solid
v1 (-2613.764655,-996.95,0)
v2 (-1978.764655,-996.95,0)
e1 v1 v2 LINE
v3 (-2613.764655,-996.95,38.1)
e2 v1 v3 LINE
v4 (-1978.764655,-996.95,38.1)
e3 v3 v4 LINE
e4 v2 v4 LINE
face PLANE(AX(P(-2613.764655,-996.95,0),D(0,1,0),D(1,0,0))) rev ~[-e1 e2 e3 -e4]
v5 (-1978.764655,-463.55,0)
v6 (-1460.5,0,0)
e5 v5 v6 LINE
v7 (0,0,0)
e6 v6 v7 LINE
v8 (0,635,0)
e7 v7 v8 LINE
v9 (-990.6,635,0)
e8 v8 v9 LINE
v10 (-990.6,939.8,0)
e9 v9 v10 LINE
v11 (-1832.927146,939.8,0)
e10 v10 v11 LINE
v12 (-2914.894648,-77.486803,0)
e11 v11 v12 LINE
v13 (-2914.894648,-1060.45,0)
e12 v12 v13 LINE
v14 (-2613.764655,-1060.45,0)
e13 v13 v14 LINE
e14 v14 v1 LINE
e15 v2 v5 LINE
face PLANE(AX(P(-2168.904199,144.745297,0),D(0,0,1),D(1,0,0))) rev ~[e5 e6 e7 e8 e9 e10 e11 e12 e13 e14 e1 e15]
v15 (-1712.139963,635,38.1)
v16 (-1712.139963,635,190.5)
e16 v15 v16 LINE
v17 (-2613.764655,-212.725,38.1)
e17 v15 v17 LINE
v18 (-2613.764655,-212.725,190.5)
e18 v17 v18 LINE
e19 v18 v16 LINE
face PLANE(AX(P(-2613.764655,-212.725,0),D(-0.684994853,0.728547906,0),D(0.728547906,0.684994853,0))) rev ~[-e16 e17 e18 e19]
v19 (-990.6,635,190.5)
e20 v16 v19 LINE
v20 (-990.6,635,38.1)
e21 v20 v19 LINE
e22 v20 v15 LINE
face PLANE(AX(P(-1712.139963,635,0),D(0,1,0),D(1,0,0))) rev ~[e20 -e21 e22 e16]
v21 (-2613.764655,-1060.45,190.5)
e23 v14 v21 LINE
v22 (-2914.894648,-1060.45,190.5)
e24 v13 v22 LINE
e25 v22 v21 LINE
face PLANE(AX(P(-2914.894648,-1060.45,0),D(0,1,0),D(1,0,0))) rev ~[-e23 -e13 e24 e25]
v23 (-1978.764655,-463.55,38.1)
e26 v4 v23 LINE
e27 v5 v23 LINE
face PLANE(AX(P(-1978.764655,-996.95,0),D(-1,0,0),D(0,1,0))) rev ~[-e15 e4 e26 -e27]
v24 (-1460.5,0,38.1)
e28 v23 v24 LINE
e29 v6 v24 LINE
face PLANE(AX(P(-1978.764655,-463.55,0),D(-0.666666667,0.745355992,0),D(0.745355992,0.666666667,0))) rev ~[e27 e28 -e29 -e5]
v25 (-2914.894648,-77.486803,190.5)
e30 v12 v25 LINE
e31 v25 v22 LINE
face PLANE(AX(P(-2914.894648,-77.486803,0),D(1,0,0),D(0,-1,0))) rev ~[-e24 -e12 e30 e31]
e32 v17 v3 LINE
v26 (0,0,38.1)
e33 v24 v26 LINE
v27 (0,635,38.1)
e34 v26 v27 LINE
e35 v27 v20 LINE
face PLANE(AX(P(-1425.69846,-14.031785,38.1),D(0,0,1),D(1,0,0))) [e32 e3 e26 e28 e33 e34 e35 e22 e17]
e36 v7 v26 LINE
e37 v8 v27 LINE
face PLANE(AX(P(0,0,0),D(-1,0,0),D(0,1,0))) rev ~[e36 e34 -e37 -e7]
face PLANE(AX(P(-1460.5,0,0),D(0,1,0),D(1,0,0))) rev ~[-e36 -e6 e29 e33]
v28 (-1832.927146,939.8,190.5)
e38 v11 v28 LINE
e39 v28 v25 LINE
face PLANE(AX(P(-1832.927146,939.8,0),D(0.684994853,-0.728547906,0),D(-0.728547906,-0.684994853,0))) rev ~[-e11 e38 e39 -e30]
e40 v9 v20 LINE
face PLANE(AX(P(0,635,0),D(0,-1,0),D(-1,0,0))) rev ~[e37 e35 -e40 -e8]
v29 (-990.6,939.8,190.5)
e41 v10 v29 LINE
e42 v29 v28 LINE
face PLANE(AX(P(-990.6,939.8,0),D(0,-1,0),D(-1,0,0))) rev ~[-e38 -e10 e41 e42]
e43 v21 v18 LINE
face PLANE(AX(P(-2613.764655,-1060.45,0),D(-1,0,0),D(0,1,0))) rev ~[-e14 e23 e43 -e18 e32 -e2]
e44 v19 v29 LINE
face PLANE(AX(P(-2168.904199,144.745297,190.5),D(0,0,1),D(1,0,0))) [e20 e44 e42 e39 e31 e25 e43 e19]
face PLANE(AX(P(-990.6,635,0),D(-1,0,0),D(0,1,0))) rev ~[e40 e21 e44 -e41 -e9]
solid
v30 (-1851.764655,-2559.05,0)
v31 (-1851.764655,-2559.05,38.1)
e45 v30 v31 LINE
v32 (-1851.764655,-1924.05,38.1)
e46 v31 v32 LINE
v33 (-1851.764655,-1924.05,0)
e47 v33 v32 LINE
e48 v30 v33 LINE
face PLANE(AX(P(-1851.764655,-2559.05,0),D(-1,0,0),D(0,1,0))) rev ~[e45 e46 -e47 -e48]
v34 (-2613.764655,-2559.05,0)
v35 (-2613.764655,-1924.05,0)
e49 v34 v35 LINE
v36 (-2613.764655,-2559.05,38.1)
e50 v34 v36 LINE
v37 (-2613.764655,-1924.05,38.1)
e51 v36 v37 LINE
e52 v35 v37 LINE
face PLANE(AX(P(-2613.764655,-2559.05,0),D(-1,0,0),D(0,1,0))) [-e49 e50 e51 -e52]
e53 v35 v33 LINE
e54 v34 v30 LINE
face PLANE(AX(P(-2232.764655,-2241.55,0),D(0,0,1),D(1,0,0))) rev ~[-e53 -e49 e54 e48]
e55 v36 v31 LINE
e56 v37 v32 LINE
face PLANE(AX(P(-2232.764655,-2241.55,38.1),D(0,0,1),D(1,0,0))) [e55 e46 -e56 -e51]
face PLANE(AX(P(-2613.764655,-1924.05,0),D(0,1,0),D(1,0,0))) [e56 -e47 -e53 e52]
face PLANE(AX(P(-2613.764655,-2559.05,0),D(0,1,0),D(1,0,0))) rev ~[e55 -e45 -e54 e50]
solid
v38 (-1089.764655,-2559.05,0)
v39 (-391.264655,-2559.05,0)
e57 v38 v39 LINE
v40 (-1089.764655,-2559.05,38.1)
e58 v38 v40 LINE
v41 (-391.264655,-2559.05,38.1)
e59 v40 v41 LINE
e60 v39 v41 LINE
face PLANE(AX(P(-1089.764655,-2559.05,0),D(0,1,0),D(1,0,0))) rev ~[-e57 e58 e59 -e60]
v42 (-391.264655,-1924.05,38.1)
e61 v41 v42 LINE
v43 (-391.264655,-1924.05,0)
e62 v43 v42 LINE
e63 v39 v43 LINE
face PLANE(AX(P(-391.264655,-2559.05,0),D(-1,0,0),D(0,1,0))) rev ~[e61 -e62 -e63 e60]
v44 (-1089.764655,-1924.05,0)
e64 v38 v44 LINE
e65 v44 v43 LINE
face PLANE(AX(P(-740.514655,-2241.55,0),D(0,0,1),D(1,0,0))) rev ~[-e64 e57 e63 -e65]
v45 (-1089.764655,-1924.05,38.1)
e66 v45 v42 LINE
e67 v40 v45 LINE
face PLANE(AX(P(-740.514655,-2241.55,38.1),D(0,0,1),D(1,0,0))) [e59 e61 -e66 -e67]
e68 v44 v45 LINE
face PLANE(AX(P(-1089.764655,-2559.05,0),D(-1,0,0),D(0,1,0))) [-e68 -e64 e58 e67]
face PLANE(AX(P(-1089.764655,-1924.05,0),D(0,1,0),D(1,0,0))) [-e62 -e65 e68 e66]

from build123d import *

# Parameters (mm, degrees)
F1_DEPTH = 38.1
F2_DEPTH = 190.5
F3_W     = 762
F3_H     = 635
F4_DEPTH = 38.1
F3_W_2   = 698.5


# Not quite as in the source:
# - a feature names something its author has since deleted; it is built from what else it names


with BuildPart() as f1:
    # F0 (on Top) → F1 (new body)
    with BuildSketch(Plane.XY):
        Polygon((-1460.5, 0), (0, 0), (0, 635), (-990.6, 635), (-1712.1399633702, 635), (-2613.764655485, -212.725), (-2613.764655485, -996.95), (-1978.764655485, -996.95), (-1978.764655485, -463.55), align=None)
    extrude(amount=F1_DEPTH)

    # F0 (on Top) → F2 (join)
    with BuildSketch(Plane.XY):
        Polygon((-1712.1399633702, 635), (-990.6, 635), (-990.6, 939.8), (-1832.9271457878, 939.8), (-2914.8946478161, -77.4868031215), (-2914.8946478161, -1060.45), (-2613.764655485, -1060.45), (-2613.764655485, -996.95), (-2613.764655485, -212.725), align=None)
    extrude(amount=F2_DEPTH)


with BuildPart() as f4:
    # F3 (on Top) → F4 (new body)
    with BuildSketch(Plane.XY):
        with Locations((-2232.764655485, -2241.55)):
            Rectangle(F3_W, F3_H)
    extrude(amount=F4_DEPTH)


with BuildPart() as f4b:
    # F3 (on Top) → F4, piece 2 (new body)
    with BuildSketch(Plane.XY):
        with Locations((-740.514655485, -2241.55)):
            Rectangle(F3_W_2, F3_H)
    extrude(amount=F4_DEPTH)


solid = Compound([f1.part, f4.part, f4b.part])
